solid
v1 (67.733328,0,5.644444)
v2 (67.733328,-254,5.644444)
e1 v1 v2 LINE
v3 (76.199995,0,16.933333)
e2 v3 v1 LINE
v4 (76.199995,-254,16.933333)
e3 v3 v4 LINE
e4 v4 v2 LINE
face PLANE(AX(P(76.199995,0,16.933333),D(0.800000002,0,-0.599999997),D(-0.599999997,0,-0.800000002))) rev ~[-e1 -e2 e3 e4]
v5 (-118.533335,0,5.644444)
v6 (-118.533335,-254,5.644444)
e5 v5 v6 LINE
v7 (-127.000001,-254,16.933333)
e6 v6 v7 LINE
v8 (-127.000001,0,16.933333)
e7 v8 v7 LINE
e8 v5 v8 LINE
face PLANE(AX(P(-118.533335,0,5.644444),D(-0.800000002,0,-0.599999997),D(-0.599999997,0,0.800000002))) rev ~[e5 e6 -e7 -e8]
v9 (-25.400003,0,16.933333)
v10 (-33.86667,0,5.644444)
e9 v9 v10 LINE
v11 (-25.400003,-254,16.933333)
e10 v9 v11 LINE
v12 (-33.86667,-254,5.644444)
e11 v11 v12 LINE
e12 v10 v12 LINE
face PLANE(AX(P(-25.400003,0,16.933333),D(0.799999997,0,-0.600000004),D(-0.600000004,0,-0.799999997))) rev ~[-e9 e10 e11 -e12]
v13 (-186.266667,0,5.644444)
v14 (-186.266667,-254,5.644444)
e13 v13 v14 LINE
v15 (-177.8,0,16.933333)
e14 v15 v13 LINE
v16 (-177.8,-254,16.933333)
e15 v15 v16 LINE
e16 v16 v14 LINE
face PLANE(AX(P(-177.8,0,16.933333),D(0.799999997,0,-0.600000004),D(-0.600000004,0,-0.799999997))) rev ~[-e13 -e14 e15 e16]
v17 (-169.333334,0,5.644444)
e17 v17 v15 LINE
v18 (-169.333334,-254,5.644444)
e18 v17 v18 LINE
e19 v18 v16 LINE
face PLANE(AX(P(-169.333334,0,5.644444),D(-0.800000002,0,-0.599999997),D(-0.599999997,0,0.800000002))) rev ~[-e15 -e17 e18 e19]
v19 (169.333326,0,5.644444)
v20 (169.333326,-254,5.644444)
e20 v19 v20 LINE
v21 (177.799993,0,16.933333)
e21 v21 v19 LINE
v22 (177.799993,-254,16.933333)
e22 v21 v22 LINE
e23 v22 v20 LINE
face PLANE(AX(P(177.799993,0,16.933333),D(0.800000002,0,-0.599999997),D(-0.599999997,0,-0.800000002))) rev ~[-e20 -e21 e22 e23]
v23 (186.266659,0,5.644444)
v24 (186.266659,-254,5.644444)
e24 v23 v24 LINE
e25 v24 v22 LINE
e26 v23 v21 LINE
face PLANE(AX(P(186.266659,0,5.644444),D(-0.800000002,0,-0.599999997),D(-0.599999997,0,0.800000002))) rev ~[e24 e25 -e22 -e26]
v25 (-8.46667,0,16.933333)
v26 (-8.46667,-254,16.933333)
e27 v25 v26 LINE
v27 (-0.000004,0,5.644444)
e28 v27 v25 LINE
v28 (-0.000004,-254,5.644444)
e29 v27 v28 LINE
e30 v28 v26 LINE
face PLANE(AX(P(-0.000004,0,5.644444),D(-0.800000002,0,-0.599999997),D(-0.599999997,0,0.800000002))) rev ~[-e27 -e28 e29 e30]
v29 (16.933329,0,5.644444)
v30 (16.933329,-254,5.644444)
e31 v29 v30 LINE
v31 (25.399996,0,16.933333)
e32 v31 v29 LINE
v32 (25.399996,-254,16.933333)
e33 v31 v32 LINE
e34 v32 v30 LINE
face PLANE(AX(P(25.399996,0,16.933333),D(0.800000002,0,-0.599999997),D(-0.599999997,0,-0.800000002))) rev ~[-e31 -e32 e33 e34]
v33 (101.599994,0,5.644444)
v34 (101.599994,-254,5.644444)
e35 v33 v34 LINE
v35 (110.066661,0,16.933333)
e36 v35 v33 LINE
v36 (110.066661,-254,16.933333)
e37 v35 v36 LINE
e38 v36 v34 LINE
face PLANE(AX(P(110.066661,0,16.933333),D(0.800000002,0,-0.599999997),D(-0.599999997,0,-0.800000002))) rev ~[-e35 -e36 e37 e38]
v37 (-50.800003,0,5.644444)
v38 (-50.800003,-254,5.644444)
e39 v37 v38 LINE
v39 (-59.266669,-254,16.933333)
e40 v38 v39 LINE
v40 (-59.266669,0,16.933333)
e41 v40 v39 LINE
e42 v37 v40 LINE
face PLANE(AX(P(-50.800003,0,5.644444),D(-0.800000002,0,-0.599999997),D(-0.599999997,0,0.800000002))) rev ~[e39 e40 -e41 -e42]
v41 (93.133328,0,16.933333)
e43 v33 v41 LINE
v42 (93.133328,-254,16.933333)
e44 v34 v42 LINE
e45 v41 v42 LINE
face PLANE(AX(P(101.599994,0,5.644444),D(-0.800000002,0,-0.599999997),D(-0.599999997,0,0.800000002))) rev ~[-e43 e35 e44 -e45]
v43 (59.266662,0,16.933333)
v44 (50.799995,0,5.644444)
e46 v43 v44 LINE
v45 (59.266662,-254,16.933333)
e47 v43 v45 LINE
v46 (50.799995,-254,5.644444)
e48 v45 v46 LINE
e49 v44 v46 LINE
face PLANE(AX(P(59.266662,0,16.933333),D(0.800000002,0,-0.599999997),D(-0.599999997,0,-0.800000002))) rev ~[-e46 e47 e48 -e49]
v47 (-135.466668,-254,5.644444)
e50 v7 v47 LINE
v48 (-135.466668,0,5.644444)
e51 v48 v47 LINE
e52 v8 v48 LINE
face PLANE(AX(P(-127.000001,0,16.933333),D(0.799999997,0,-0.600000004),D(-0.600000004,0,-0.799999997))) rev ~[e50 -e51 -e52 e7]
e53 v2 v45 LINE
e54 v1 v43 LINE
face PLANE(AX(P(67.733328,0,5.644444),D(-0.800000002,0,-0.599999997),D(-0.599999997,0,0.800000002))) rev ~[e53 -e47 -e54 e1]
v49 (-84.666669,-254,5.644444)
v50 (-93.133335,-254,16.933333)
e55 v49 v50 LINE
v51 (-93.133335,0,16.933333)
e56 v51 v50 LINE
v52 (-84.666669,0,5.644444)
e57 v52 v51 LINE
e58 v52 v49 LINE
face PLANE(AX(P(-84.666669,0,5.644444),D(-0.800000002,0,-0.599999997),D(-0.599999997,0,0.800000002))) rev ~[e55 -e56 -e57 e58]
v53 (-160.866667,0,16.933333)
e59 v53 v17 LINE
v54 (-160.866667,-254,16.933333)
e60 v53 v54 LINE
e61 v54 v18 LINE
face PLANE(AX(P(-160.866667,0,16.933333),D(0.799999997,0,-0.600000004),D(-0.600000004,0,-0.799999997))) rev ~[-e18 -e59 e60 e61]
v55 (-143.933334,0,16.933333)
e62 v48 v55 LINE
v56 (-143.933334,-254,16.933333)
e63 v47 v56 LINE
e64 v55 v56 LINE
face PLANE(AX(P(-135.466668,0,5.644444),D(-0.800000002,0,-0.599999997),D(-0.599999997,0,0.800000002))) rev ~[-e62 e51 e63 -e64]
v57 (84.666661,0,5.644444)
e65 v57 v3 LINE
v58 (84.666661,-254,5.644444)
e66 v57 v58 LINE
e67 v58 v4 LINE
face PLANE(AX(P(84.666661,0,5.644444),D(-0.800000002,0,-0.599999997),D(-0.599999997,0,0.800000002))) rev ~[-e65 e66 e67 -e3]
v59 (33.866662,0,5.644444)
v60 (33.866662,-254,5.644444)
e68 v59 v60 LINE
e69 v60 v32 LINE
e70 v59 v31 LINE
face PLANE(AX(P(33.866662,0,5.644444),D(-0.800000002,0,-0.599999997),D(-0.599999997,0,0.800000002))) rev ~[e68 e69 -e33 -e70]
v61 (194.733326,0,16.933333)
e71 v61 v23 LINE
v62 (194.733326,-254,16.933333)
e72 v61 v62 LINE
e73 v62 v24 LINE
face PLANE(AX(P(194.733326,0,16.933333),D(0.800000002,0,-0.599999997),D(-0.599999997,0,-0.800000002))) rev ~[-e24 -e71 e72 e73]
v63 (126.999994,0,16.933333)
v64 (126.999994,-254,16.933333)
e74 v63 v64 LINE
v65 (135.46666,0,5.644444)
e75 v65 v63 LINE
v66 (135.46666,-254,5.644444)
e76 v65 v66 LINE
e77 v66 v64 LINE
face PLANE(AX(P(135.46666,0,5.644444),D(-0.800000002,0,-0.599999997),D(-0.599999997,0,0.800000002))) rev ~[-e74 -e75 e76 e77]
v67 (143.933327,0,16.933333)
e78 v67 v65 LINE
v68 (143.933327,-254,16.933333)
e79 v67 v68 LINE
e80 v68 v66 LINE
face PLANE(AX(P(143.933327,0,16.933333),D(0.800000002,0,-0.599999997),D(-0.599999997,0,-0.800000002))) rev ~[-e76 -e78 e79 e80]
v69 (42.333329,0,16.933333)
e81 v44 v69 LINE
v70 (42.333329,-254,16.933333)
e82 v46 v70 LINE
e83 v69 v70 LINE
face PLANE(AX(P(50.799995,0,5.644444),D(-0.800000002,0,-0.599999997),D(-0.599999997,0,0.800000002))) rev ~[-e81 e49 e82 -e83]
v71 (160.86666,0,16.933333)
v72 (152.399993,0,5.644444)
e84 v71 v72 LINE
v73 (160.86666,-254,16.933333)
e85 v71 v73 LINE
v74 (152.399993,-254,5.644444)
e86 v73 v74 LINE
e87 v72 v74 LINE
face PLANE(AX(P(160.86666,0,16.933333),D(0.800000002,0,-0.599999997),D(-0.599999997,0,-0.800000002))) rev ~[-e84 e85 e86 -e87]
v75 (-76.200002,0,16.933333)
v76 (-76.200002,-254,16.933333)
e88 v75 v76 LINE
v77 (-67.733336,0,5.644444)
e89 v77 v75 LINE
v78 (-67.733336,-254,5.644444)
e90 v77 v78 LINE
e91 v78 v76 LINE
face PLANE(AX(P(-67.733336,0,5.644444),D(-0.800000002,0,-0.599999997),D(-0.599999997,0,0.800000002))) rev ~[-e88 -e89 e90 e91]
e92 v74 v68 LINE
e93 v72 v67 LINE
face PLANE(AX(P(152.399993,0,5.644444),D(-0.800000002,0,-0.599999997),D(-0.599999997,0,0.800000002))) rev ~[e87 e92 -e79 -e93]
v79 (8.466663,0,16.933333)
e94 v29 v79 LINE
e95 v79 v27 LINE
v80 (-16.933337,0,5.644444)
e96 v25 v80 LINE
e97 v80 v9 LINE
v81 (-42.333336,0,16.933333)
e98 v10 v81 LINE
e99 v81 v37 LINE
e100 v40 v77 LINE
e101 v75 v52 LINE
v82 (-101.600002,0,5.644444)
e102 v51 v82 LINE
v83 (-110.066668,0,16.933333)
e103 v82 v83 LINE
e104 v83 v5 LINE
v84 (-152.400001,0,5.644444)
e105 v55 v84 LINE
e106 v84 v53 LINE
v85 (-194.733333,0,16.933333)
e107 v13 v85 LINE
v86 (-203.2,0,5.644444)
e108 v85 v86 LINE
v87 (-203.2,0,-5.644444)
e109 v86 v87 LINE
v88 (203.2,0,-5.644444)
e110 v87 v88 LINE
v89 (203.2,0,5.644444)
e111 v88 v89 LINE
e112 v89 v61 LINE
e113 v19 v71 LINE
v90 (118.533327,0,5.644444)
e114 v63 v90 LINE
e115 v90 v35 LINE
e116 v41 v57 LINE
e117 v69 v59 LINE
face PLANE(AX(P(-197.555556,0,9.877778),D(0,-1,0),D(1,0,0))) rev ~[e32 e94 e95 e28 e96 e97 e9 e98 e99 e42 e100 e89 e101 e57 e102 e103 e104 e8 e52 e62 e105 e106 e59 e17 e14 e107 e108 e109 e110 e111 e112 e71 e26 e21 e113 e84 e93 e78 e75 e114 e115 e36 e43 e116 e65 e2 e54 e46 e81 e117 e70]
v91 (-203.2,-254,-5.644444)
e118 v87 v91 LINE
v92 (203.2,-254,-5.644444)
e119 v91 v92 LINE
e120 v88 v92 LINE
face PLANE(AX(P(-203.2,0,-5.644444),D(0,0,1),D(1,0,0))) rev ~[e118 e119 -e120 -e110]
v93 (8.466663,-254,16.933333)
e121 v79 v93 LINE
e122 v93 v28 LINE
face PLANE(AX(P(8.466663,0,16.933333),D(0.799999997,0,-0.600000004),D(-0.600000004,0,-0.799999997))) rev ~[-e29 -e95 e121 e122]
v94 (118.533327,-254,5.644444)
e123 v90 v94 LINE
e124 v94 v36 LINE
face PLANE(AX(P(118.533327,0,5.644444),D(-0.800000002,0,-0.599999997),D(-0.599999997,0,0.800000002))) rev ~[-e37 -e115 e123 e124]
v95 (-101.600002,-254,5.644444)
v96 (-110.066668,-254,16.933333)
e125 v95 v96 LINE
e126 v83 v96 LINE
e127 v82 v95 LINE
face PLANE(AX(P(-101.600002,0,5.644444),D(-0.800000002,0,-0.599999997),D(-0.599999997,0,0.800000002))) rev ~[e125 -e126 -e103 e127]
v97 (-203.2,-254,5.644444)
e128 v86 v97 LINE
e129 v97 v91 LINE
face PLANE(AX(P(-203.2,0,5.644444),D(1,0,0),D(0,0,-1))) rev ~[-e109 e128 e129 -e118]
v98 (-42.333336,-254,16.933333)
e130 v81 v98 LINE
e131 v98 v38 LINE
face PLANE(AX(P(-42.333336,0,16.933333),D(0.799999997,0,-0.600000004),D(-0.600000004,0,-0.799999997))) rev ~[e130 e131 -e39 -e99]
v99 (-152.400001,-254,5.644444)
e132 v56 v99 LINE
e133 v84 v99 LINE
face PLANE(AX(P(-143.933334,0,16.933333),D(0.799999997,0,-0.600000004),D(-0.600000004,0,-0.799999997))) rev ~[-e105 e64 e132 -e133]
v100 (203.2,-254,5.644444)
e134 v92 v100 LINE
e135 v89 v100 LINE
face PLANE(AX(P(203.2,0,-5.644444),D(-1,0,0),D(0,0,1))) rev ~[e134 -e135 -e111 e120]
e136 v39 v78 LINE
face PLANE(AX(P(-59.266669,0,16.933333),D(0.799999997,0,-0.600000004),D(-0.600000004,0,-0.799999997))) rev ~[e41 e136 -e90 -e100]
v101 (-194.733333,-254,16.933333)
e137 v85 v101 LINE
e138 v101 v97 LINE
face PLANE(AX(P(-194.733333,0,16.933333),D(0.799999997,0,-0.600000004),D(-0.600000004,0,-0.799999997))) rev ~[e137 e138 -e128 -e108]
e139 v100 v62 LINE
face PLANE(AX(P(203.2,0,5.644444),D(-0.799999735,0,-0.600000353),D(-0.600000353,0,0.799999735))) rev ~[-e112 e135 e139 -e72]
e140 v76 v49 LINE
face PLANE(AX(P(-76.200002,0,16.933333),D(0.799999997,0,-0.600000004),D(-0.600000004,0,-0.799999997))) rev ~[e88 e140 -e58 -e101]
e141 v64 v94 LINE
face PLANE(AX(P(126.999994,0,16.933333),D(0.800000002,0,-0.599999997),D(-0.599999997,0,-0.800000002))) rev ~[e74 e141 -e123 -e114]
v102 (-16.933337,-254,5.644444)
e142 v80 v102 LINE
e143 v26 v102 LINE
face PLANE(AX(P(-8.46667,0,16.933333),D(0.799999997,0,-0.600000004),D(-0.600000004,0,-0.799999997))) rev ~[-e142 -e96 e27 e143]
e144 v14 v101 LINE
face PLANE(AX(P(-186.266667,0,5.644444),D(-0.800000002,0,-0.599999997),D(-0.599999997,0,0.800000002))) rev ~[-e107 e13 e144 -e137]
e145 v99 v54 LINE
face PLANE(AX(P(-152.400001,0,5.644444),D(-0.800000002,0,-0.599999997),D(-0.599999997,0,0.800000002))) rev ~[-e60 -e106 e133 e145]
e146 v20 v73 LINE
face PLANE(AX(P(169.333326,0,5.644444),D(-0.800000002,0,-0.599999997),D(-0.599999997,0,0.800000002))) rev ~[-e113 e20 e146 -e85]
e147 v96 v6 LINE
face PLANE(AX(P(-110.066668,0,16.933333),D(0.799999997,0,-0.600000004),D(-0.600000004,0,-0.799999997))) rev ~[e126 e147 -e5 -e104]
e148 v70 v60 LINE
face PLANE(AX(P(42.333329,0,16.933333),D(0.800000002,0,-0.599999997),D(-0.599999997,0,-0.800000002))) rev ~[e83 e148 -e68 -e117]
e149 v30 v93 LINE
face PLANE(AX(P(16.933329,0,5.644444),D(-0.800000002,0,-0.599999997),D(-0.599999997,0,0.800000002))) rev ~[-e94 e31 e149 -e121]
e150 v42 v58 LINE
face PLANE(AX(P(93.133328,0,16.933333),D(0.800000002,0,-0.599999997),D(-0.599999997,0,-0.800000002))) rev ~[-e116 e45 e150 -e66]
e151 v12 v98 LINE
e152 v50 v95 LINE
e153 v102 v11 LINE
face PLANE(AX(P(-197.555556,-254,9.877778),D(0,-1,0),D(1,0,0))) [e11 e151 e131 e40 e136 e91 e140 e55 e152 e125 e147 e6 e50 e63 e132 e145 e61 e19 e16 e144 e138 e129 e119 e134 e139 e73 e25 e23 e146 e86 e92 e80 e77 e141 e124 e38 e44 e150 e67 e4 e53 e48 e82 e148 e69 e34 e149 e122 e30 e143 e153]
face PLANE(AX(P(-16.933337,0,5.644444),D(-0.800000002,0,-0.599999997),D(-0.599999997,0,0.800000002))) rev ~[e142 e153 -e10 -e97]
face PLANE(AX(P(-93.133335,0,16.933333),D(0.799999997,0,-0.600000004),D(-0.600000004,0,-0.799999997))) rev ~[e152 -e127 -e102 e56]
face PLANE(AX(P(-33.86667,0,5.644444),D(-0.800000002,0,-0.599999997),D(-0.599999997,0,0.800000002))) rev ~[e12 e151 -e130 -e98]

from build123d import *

# Parameters (mm, degrees)
F1_DEPTH = 254


# Not quite as in the source:
# - ends of sketch curves that miss each other by under 0.0002 mm in the source are joined


with BuildPart() as f1:
    # F0 (on Front) → F1 (new body)
    with BuildSketch(Plane.XZ):
        Polygon((-194.73333335, 16.9333332013), (-203.2, 5.6444444388), (-194.73333335, 5.6444444388), align=None)
        Polygon((-194.73333335, 5.6444444388), (-203.2, 5.6444444388), (-203.2, -5.6444444388), (203.2, -5.6444444388), (203.2, 5.6444444388), (186.26665915, 5.6444444388), (169.33332615, 5.6444444388), (152.39999315, 5.6444444388), (135.46666015, 5.6444444388), (118.53332715, 5.6444444388), (101.59999415, 5.6444444388), (84.66666115, 5.6444444388), (67.73332815, 5.6444444388), (50.79999515, 5.6444444388), (33.86666215, 5.6444444388), (16.93332915, 5.6444444388), (-3.85e-06, 5.6444444388), (-16.93333685, 5.6444444388), (-33.86666985, 5.6444444388), (-50.80000285, 5.6444444388), (-67.73333585, 5.6444444388), (-84.66666885, 5.6444444388), (-101.60000185, 5.6444444388), (-118.53333485, 5.6444444388), (-135.46666785, 5.6444444388), (-152.40000085, 5.6444444388), (-169.33333385, 5.6444444388), (-186.26666685, 5.6444444388), align=None)
        Polygon((-194.73333335, 16.9333332013), (-194.73333335, 5.6444444388), (-186.26666685, 5.6444444388), align=None)
        Polygon((-177.80000035, 16.9333332013), (-186.266667, 5.6444444388), (-169.33333385, 5.6444444388), align=None)
        Polygon((-160.86666735, 16.9333332013), (-169.333334, 5.6444444388), (-152.40000085, 5.6444444388), align=None)
        Polygon((186.26665915, 5.6444444388), (203.2, 5.6444444388), (194.73332565, 16.9333332013), align=None)
        Polygon((-143.93333435, 16.9333332013), (-152.400001, 5.6444444388), (-135.46666785, 5.6444444388), align=None)
        Polygon((169.33332615, 5.6444444388), (186.26665915, 5.6444444388), (177.79999265, 16.9333332013), align=None)
        Polygon((-127.00000135, 16.9333332013), (-135.466668, 5.6444444388), (-118.53333485, 5.6444444388), align=None)
        Polygon((152.39999315, 5.6444444388), (169.33332615, 5.6444444388), (160.86665965, 16.9333332013), align=None)
        Polygon((-110.06666835, 16.9333332013), (-118.533335, 5.6444444388), (-101.60000185, 5.6444444388), align=None)
        Polygon((135.46666015, 5.6444444388), (152.39999315, 5.6444444388), (143.93332665, 16.9333332013), align=None)
        Polygon((-93.13333535, 16.9333332013), (-101.600002, 5.6444444388), (-84.66666885, 5.6444444388), align=None)
        Polygon((118.53332715, 5.6444444388), (135.46666015, 5.6444444388), (126.99999365, 16.9333332013), align=None)
        Polygon((-76.20000235, 16.9333332013), (-84.666669, 5.6444444388), (-67.73333585, 5.6444444388), align=None)
        Polygon((101.59999415, 5.6444444388), (118.53332715, 5.6444444388), (110.06666065, 16.9333332013), align=None)
        Polygon((-59.26666935, 16.9333332013), (-67.733336, 5.6444444388), (-50.80000285, 5.6444444388), align=None)
        Polygon((84.66666115, 5.6444444388), (101.59999415, 5.6444444388), (93.13332765, 16.9333332013), align=None)
        Polygon((-42.33333635, 16.9333332013), (-50.800003, 5.6444444388), (-33.86666985, 5.6444444388), align=None)
        Polygon((67.73332815, 5.6444444388), (84.66666115, 5.6444444388), (76.19999465, 16.9333332013), align=None)
        Polygon((-25.40000335, 16.9333332013), (-33.86667, 5.6444444388), (-16.93333685, 5.6444444388), align=None)
        Polygon((50.79999515, 5.6444444388), (67.73332815, 5.6444444388), (59.26666165, 16.9333332013), align=None)
        Polygon((-8.46667035, 16.9333332013), (-16.933337, 5.6444444388), (-3.85e-06, 5.6444444388), align=None)
        Polygon((33.86666215, 5.6444444388), (50.79999515, 5.6444444388), (42.33332865, 16.9333332013), align=None)
        Polygon((8.46666265, 16.9333332013), (-4e-06, 5.6444444388), (16.93332915, 5.6444444388), align=None)
        Polygon((16.93332915, 5.6444444388), (33.86666215, 5.6444444388), (25.39999565, 16.9333332013), align=None)
    extrude(amount=F1_DEPTH)


solid = f1.part
